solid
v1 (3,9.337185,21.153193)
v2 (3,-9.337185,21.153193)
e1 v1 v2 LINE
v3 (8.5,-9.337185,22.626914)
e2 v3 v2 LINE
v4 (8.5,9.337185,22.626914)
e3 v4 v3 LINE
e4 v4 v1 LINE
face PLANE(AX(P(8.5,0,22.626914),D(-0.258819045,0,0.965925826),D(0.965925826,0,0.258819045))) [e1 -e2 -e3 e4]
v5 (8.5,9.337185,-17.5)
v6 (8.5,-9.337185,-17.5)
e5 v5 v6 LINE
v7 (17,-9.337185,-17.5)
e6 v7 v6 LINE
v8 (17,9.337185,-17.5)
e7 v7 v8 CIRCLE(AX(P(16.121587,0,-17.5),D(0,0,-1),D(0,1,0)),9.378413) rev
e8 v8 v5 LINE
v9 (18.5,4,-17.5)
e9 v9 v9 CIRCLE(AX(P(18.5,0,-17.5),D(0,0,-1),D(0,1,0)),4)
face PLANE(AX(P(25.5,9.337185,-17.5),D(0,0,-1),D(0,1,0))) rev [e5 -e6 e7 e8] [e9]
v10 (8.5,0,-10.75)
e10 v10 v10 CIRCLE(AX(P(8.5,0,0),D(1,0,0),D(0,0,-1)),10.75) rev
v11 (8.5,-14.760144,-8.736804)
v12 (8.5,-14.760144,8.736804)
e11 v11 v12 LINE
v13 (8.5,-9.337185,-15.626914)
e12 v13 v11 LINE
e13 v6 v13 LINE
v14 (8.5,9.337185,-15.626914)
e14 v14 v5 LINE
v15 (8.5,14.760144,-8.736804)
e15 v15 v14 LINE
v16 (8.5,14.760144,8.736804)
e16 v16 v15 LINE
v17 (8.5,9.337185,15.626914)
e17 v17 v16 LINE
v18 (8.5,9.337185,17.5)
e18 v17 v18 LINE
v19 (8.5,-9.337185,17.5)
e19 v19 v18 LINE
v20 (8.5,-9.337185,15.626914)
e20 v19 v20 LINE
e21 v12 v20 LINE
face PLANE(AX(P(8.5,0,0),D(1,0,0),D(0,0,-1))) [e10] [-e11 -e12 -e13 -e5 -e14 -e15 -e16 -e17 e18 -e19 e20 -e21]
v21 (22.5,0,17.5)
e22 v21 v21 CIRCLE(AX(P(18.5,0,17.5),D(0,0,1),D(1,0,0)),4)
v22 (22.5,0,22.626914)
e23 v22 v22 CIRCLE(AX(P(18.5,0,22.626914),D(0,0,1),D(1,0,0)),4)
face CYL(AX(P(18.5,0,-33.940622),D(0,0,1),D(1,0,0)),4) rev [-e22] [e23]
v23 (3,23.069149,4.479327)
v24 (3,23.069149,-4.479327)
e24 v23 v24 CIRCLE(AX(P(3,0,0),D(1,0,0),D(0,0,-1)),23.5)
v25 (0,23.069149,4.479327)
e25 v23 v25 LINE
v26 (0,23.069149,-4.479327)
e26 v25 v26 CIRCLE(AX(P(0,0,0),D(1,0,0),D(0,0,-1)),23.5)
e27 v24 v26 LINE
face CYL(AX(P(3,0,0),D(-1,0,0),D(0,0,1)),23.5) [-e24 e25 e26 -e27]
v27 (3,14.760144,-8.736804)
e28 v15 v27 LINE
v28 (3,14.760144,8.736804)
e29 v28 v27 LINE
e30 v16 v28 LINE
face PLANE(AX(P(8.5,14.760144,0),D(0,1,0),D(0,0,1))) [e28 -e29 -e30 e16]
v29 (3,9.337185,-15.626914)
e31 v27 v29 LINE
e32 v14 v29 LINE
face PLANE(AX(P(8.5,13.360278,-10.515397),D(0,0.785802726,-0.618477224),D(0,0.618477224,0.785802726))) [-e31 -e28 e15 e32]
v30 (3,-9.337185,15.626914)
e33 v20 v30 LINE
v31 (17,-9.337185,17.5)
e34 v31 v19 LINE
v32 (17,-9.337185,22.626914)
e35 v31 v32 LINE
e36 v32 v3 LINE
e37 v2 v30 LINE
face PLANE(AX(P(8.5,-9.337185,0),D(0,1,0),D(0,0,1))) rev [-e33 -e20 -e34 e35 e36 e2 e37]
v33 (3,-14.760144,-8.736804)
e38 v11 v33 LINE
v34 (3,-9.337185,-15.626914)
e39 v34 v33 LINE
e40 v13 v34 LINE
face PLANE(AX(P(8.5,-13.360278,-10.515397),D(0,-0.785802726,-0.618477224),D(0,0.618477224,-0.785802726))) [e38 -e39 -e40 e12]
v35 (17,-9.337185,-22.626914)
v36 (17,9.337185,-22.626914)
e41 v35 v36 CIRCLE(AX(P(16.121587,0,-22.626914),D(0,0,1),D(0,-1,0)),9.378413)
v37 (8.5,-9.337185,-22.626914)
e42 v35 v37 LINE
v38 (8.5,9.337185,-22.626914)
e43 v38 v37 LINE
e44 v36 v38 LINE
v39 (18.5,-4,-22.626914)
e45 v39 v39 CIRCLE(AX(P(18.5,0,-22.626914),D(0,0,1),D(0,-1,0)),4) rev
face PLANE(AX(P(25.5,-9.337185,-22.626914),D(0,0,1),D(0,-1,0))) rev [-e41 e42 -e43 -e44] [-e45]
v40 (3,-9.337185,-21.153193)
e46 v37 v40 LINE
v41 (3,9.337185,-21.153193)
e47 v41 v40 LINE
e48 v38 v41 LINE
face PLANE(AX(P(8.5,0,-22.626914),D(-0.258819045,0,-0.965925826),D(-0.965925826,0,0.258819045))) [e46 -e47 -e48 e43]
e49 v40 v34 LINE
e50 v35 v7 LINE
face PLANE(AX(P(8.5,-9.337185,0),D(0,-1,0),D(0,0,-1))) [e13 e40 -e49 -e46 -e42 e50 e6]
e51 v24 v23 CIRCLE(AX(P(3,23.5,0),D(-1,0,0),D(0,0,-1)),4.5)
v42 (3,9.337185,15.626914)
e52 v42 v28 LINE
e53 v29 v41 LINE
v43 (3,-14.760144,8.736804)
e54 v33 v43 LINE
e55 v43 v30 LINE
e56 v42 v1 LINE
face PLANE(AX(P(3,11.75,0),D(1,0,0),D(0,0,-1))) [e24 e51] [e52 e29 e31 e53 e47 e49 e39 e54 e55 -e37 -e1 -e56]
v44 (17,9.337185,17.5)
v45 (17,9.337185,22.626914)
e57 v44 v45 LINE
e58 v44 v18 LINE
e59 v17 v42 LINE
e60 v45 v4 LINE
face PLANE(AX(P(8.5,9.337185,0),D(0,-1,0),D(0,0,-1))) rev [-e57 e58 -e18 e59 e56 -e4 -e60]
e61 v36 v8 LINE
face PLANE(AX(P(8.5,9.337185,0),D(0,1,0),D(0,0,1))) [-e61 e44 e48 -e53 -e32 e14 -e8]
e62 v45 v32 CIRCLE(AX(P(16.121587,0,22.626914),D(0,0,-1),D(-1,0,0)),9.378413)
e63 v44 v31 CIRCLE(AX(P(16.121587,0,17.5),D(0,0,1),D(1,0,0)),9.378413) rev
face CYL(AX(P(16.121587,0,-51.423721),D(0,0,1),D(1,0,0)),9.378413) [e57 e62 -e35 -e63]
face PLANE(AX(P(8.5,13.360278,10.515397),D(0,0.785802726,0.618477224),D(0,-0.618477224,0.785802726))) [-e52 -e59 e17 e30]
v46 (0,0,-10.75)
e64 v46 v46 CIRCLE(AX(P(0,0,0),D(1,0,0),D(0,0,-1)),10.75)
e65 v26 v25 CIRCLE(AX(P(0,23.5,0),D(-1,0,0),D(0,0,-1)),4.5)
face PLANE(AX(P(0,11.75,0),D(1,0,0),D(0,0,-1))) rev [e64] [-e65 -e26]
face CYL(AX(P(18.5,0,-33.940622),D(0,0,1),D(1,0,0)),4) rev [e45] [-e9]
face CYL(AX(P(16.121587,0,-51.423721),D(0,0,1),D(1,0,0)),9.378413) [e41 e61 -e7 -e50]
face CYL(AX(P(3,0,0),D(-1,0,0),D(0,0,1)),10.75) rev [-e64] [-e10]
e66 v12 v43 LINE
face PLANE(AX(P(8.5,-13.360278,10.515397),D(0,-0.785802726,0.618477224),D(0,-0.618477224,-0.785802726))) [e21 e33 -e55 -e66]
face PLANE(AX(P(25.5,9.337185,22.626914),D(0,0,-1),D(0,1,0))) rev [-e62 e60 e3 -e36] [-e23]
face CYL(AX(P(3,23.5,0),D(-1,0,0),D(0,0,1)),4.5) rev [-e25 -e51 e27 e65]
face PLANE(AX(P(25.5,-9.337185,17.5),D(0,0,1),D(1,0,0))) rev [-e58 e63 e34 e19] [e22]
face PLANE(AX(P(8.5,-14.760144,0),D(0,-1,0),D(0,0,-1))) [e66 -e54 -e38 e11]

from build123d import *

# Parameters (mm, degrees)
SKETCH1_R           = 10.75
BOSS_EXTRUDE1_DEPTH = 3
SKETCH2_R           = 10.75
BOSS_EXTRUDE2_DEPTH = 5.5
DRAFT5_START        = -9.337185289
DRAFT5_DEPTH        = 18.674370578
SKETCH3_W           = 5.126913696
SKETCH3_H           = 18.674370578
BOSS_EXTRUDE3_DEPTH = 17
CUT_EXTRUDE1_REACH  = 59.708
CUT_EXTRUDE2_REACH  = 59.708
SKETCH5_R           = 4


# Read off the part's stored shape, not the designer's step: Draft5
with BuildPart() as part:
    # Sketch1 → Boss-Extrude1 (new body)
    with BuildSketch(Plane(origin=(0, 0, 0), x_dir=(0, 0, -1), z_dir=(1, 0, 0))):
        with BuildLine():
            ThreePointArc((-4.479326664, 23.069148936), (0, -23.5), (4.479326664, 23.069148936))
            ThreePointArc((4.479326664, 23.069148936), (0, 19), (-4.479326664, 23.069148936))
        make_face()
        Circle(SKETCH1_R, mode=Mode.SUBTRACT)
    extrude(amount=BOSS_EXTRUDE1_DEPTH)

    # Sketch2 → Boss-Extrude2 (add)
    # profile 1 of 7: a face of its own
    with BuildSketch(Plane(origin=(3, 0, 0), x_dir=(0, 0, -1), z_dir=(1, 0, 0))):
        with BuildLine():
            Line((-15.626913696, -9.337185289), (-15.626913696, 9.337185289))
            Line((-15.626913696, 9.337185289), (-21.565411447, 9.337185289))
            ThreePointArc((-21.565411447, 9.337185289), (-22.146716975, 7.859575512), (-22.626913696, 6.346083564))
            Line((-22.626913696, 6.346083564), (-22.626913696, -6.346083564))
            ThreePointArc((-22.626913696, -6.346083564), (-22.146716975, -7.859575512), (-21.565411447, -9.337185289))
            Line((-21.565411447, -9.337185289), (-15.626913696, -9.337185289))
        make_face()
    # profile 2 of 7: a face of its own
    with BuildSketch(Plane(origin=(3, 0, 0), x_dir=(0, 0, -1), z_dir=(1, 0, 0))):
        Polygon((-15.626913696, -9.337185289), (-15.626913696, 9.337185289), (-8.736803998, 14.760144229), (8.736803998, 14.760144229), (15.626913696, 9.337185289), (15.626913696, -9.337185289), (8.736803998, -14.760144229), (-8.736803998, -14.760144229), align=None)
        Circle(SKETCH2_R, mode=Mode.SUBTRACT)
    # profile 3 of 7: a face of its own
    with BuildSketch(Plane(origin=(3, 0, 0), x_dir=(0, 0, -1), z_dir=(1, 0, 0))):
        with BuildLine():
            Line((21.565411447, 9.337185289), (15.626913696, 9.337185289))
            Line((15.626913696, 9.337185289), (15.626913696, -9.337185289))
            Line((15.626913696, -9.337185289), (21.565411447, -9.337185289))
            ThreePointArc((21.565411447, -9.337185289), (22.146716975, -7.859575512), (22.626913696, -6.346083564))
            Line((22.626913696, -6.346083564), (22.626913696, 6.346083564))
            ThreePointArc((22.626913696, 6.346083564), (22.146716975, 7.859575512), (21.565411447, 9.337185289))
        make_face()
    # profile 4 of 7: a face of its own
    with BuildSketch(Plane(origin=(3, 0, 0), x_dir=(0, 0, -1), z_dir=(1, 0, 0))):
        with BuildLine():
            ThreePointArc((-22.626913696, 6.346083564), (-22.146716975, 7.859575512), (-21.565411447, 9.337185289))
            Line((-21.565411447, 9.337185289), (-22.626913696, 9.337185289))
            Line((-22.626913696, 9.337185289), (-22.626913696, 6.346083564))
        make_face()
    # profile 5 of 7: a face of its own
    with BuildSketch(Plane(origin=(3, 0, 0), x_dir=(0, 0, -1), z_dir=(1, 0, 0))):
        with BuildLine():
            Line((-22.626913696, -9.337185289), (-21.565411447, -9.337185289))
            ThreePointArc((-21.565411447, -9.337185289), (-22.146716975, -7.859575512), (-22.626913696, -6.346083564))
            Line((-22.626913696, -6.346083564), (-22.626913696, -9.337185289))
        make_face()
    # profile 6 of 7: a face of its own
    with BuildSketch(Plane(origin=(3, 0, 0), x_dir=(0, 0, -1), z_dir=(1, 0, 0))):
        with BuildLine():
            Line((22.626913696, 9.337185289), (21.565411447, 9.337185289))
            ThreePointArc((21.565411447, 9.337185289), (22.146716975, 7.859575512), (22.626913696, 6.346083564))
            Line((22.626913696, 6.346083564), (22.626913696, 9.337185289))
        make_face()
    # profile 7 of 7: a face of its own
    with BuildSketch(Plane(origin=(3, 0, 0), x_dir=(0, 0, -1), z_dir=(1, 0, 0))):
        with BuildLine():
            ThreePointArc((22.626913696, -6.346083564), (22.146716975, -7.859575512), (21.565411447, -9.337185289))
            Line((21.565411447, -9.337185289), (22.626913696, -9.337185289))
            Line((22.626913696, -9.337185289), (22.626913696, -6.346083564))
        make_face()
    extrude(amount=BOSS_EXTRUDE2_DEPTH)

    # Draft5 outline → Draft5 (cut)
    with BuildSketch(Plane(origin=(0, 0, 0), x_dir=(1, 0, 0), z_dir=(0, 1, 0)).offset(DRAFT5_START)):
        Polygon((3, 22.626913696), (3, 21.153193137), (8.5, 22.626913696), align=None)
        Polygon((3, -21.153193137), (3, -22.626913696), (8.5, -22.626913696), align=None)
    extrude(amount=DRAFT5_DEPTH, mode=Mode.SUBTRACT)

    # Sketch3 → Boss-Extrude3 (add)
    with BuildSketch(Plane(origin=(8.5, 0, 0), x_dir=(0, 0, -1), z_dir=(1, 0, 0))):
        with Locations((-20.063456848, 0)):
            Rectangle(SKETCH3_W, SKETCH3_H)
        with Locations((20.063456848, 0)):
            Rectangle(SKETCH3_W, SKETCH3_H)
    extrude(amount=BOSS_EXTRUDE3_DEPTH)

    # Cut-Extrude1: up to this face of the body (flat: up to its plane)
    cut_extrude1_end = Plane(part.part.faces().sort_by_distance((17, 0, -22.626913696))[0])
    # Sketch4 → Cut-Extrude1 (cut, up to the picked face)
    with BuildSketch(Plane.XY.offset(22.626913696), mode=Mode.PRIVATE) as cut_extrude1_sk1:
        with BuildLine():
            Line((17, 9.337185289), (17, 12.880835783))
            Line((17, 12.880835783), (29.443712865, 12.880835783))
            Line((29.443712865, 12.880835783), (29.443712865, -13.088571654))
            Line((29.443712865, -13.088571654), (17, -13.088571654))
            Line((17, -13.088571654), (17, -9.337185289))
            ThreePointArc((17, -9.337185289), (25.5, 0), (17, 9.337185289))
        make_face()
    cut_extrude1_tool1 = split(extrude(cut_extrude1_sk1.sketch, amount=-CUT_EXTRUDE1_REACH, mode=Mode.PRIVATE), bisect_by=cut_extrude1_end, keep=Keep.BOTH, mode=Mode.PRIVATE)
    add(cut_extrude1_tool1.solids().sort_by(Axis((17.287968, 11.109011, 22.626914), (0, 0, -1)))[0], mode=Mode.SUBTRACT)

    # Cut-Extrude2: up to this face of the body (flat: up to its plane)
    cut_extrude2_end = Plane(part.part.faces().sort_by_distance((16.148390538, 0, -22.626913696))[0])
    # Sketch5 → Cut-Extrude2 (cut, up to the picked face)
    with BuildSketch(Plane.XY.offset(22.626913696), mode=Mode.PRIVATE) as cut_extrude2_sk1:
        with Locations(Location((18.5, 0, 0), (0, 0, 270))):
            Circle(SKETCH5_R)
    cut_extrude2_tool1 = split(extrude(cut_extrude2_sk1.sketch, amount=-CUT_EXTRUDE2_REACH, mode=Mode.PRIVATE), bisect_by=cut_extrude2_end, keep=Keep.BOTH, mode=Mode.PRIVATE)
    add(cut_extrude2_tool1.solids().sort_by(Axis((18.5, 0, 22.626914), (0, 0, -1)))[0], mode=Mode.SUBTRACT)


solid = part.part
